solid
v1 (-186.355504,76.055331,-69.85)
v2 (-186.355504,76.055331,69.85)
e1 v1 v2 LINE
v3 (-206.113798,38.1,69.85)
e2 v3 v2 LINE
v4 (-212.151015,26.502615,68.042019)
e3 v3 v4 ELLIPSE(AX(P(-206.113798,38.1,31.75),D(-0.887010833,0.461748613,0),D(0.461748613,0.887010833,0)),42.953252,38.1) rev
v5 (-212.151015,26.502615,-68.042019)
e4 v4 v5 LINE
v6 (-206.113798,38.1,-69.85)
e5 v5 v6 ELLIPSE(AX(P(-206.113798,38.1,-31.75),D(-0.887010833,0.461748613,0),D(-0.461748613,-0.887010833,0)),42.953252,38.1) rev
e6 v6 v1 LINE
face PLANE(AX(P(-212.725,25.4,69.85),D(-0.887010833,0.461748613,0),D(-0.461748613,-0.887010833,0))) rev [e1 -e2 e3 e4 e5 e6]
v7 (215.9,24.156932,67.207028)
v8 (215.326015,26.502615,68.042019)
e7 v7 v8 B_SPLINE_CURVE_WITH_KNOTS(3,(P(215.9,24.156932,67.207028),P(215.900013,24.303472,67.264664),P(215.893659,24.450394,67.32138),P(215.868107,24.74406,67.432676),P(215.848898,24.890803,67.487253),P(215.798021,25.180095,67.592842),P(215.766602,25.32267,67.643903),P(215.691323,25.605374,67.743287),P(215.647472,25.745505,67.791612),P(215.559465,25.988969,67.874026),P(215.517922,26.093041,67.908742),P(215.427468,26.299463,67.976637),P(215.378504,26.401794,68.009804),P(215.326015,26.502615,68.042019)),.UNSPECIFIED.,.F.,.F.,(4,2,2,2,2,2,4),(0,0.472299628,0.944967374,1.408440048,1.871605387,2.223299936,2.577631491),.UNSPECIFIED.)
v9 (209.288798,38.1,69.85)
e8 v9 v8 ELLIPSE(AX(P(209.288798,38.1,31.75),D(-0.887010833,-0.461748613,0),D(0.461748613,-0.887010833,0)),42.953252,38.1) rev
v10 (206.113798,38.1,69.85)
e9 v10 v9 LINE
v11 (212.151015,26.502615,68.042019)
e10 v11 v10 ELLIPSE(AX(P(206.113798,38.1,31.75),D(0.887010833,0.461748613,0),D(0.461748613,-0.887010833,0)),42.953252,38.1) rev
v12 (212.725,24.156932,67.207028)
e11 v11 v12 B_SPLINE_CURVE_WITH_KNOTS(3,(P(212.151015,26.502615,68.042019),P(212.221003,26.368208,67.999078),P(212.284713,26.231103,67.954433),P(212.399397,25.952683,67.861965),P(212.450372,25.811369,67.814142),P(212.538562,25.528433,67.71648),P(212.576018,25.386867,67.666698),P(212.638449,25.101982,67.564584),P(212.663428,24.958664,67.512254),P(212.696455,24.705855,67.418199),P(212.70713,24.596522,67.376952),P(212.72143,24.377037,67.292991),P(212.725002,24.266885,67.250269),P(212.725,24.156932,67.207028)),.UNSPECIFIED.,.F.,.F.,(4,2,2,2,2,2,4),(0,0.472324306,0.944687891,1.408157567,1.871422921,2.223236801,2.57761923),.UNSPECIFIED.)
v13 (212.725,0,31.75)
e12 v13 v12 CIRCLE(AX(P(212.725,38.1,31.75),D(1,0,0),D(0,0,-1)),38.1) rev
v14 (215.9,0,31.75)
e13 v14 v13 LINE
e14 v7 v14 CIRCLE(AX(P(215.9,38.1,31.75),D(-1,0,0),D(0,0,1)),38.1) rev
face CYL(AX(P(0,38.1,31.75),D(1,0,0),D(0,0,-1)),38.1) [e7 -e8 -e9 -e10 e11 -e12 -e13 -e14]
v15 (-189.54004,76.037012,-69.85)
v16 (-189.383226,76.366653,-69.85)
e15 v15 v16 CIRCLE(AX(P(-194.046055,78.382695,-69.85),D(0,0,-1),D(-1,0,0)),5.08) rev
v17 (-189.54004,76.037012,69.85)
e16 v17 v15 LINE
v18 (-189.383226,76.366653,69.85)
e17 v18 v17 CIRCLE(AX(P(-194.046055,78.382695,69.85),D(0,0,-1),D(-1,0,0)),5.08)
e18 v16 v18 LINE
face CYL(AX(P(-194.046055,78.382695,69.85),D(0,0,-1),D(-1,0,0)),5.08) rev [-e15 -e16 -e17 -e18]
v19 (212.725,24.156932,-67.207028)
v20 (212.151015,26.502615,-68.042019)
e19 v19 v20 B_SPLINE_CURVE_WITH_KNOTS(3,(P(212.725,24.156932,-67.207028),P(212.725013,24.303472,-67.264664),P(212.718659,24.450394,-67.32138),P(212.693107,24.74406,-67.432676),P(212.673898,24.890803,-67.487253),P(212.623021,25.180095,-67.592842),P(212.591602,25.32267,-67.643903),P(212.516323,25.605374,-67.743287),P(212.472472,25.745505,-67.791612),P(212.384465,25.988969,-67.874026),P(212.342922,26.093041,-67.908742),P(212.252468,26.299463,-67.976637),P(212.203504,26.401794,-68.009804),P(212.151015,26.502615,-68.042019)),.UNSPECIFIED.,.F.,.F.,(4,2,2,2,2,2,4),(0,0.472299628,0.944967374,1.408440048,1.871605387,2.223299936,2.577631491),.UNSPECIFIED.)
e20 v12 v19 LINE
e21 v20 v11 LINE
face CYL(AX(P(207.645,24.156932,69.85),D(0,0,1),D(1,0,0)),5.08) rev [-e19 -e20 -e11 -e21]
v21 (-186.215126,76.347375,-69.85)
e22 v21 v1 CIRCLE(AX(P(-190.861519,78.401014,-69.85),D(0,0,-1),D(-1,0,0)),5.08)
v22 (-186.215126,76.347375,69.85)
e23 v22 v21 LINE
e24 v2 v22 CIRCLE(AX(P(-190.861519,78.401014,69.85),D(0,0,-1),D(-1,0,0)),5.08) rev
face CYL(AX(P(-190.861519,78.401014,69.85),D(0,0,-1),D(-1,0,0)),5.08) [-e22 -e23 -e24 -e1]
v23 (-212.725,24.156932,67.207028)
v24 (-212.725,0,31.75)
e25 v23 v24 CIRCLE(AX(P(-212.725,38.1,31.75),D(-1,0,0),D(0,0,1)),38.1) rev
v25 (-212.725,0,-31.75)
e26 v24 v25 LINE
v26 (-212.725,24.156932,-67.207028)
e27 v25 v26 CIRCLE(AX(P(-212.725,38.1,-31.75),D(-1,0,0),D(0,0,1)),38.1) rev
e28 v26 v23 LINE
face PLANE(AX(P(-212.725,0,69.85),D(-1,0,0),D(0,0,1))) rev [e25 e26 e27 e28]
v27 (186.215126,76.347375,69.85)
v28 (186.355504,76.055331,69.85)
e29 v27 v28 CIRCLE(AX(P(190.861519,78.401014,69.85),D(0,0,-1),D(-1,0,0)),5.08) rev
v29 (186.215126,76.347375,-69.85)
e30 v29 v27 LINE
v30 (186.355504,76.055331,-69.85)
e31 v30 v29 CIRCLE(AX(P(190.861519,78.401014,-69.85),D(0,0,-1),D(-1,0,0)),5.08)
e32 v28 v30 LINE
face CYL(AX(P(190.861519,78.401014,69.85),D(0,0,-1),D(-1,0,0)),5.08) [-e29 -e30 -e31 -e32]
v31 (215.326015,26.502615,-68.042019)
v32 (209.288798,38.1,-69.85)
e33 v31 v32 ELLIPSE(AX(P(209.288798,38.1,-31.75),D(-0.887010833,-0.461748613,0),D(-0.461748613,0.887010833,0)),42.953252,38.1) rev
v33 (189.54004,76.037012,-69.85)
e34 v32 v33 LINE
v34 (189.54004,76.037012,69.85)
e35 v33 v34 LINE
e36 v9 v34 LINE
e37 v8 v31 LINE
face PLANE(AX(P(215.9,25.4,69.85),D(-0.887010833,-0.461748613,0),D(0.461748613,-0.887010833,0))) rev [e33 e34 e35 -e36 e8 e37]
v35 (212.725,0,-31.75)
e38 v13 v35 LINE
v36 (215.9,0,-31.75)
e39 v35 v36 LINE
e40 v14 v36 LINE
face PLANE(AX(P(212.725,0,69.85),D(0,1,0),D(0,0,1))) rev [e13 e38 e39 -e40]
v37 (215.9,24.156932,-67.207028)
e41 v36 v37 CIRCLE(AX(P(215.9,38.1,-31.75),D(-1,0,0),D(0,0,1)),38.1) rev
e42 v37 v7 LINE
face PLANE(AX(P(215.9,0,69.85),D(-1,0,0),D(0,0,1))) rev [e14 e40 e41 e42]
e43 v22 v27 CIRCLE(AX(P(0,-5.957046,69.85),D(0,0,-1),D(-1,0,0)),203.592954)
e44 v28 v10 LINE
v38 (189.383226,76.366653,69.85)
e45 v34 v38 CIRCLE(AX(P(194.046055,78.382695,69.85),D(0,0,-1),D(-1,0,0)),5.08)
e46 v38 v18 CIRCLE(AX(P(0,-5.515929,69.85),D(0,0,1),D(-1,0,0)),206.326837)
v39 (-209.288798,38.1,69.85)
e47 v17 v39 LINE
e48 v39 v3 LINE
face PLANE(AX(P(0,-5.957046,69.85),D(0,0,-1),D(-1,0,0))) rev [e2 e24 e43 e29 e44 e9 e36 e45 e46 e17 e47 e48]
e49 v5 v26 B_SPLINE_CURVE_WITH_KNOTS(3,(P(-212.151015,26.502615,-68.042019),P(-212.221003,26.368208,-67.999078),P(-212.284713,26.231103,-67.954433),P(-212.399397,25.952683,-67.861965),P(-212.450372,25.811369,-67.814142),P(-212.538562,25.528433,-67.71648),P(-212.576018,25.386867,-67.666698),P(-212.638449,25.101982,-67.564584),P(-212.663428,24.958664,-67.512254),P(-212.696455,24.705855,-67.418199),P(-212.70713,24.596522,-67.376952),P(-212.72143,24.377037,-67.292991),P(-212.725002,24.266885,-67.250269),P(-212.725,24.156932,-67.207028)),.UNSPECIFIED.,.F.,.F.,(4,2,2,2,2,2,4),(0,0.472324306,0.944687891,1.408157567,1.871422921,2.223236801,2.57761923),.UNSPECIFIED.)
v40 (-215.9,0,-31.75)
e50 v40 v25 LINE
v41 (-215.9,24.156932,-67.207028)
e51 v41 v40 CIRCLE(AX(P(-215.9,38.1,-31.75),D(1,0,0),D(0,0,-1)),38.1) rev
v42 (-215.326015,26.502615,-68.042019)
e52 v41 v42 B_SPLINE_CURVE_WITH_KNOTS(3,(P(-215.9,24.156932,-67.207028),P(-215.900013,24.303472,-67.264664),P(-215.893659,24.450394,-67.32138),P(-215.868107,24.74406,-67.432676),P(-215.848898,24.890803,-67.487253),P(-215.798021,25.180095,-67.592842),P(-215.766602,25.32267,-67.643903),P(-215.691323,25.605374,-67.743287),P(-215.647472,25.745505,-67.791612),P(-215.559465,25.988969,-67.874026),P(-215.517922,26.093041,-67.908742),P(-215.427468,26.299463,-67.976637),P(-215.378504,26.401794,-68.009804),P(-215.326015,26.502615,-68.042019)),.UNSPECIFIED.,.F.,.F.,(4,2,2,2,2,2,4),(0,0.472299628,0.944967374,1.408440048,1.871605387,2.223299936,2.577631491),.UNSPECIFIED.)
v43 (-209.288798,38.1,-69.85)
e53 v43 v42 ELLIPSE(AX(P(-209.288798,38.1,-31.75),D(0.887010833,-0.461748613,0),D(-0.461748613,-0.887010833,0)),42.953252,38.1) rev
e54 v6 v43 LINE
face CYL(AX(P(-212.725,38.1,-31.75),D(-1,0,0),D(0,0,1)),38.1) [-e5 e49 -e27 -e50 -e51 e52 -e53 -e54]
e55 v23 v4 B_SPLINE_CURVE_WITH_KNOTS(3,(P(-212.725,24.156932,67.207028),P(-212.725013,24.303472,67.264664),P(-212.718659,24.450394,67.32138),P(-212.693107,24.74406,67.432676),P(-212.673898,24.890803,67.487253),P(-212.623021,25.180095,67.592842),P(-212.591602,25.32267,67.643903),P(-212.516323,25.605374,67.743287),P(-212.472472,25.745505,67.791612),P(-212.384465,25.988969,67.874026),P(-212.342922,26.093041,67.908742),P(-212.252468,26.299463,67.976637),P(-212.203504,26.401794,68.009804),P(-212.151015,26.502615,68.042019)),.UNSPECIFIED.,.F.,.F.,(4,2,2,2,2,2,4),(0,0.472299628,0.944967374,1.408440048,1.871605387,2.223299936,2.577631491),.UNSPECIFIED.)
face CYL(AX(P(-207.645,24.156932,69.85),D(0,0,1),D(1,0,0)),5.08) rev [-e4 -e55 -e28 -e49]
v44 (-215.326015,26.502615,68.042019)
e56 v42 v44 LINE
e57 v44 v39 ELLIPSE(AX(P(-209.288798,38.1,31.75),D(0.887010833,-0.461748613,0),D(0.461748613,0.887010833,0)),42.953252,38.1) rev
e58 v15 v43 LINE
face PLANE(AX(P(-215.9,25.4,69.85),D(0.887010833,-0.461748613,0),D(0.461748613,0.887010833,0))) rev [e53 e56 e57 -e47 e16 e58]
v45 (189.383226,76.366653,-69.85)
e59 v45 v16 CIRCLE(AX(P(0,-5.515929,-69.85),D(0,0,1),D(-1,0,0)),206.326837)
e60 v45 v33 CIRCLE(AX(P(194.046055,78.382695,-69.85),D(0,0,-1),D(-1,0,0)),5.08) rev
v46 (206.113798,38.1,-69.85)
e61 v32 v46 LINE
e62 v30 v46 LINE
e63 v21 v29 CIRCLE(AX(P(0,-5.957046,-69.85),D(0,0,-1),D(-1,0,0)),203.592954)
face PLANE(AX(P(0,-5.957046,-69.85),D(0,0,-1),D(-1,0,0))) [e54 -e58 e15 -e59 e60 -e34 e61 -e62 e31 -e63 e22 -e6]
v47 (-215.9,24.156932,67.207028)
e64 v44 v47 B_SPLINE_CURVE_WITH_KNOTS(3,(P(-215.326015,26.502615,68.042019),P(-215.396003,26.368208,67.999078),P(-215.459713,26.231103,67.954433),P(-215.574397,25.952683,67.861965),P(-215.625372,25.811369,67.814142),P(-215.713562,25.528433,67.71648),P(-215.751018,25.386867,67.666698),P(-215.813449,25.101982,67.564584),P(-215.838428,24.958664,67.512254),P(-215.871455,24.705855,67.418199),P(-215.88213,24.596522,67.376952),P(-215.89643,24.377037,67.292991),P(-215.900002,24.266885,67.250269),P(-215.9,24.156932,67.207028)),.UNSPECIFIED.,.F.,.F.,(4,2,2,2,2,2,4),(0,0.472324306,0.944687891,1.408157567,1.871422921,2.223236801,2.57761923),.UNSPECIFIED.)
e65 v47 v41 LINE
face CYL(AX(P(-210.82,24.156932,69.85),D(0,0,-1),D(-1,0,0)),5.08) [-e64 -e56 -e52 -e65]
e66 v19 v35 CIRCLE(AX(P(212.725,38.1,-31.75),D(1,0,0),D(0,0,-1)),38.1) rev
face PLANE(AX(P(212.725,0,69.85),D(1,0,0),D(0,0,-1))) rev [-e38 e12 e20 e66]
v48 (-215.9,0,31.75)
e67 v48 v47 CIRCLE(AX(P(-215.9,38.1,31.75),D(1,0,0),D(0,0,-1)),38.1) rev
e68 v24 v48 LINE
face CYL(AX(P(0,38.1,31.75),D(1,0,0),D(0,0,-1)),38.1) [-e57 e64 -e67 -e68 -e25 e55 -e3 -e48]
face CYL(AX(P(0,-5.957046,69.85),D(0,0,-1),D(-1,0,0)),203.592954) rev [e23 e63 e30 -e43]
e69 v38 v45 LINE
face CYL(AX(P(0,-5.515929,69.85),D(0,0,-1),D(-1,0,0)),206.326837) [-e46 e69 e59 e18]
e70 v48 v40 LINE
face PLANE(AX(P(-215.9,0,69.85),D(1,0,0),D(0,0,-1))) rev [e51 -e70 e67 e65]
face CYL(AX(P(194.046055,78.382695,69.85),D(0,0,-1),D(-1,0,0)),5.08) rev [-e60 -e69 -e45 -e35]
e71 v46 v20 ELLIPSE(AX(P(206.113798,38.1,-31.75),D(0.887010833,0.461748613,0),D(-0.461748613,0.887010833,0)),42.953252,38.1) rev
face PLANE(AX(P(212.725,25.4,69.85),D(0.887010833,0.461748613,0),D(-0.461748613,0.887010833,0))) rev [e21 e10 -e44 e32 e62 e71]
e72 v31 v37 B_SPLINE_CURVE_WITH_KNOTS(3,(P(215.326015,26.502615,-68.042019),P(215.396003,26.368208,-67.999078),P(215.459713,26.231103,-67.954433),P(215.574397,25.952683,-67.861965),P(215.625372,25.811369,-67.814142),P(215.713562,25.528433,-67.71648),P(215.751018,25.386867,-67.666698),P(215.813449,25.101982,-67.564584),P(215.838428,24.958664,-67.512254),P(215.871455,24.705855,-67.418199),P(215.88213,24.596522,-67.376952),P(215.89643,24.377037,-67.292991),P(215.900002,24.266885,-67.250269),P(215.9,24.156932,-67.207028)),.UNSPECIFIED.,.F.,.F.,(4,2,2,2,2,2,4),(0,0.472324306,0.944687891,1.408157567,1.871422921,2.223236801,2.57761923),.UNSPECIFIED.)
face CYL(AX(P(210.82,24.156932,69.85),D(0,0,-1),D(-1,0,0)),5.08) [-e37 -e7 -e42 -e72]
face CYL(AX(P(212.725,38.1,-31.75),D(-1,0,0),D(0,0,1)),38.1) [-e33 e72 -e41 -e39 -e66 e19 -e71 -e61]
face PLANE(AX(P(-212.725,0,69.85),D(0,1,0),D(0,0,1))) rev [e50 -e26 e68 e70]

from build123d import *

# Parameters (mm, degrees)
BOSS_EXTRUDE1_DEPTH = 69.85
FILLET1_R           = 38.1
FILLET2_R           = 38.1
FILLET3_R           = 38.1
FILLET4_R           = 38.1
FILLET5_R           = 5.08
FILLET6_R           = 5.08


with BuildPart() as part:
    # Sketch2 → Boss-Extrude1 (new, symmetric)
    with BuildSketch(Plane.XY):
        with BuildLine():
            Line((-212.725, 0), (-215.9, 0))
            Line((-215.9, 0), (-215.9, 25.4))
            Line((-215.9, 25.4), (-189.455193832, 76.2))
            ThreePointArc((-189.455193832, 76.2), (0, 200.810907661), (189.455193832, 76.2))
            Line((189.455193832, 76.2), (215.9, 25.4))
            Line((215.9, 25.4), (215.9, 0))
            Line((215.9, 0), (212.725, 0))
            Line((212.725, 0), (212.725, 25.4))
            Line((212.725, 25.4), (186.280193832, 76.2))
            ThreePointArc((186.280193832, 76.2), (0, 197.635907661), (-186.280193832, 76.2))
            Line((-186.280193832, 76.2), (-212.725, 25.4))
            Line((-212.725, 25.4), (-212.725, 0))
        make_face()
    extrude(amount=BOSS_EXTRUDE1_DEPTH, both=True)

    # Fillet1
    # the kernel refuses this fillet: 38.1 mm, written as the material it takes off along each edge
    with BuildSketch(Plane(origin=(311.15, 0, -69.85), x_dir=(0, 1, 0), z_dir=(-1, 0, 0))) as fillet1_piece_1:
        with BuildLine():
            CenterArc((FILLET1_R, -FILLET1_R), FILLET1_R, 90, 90)
            Line((0, -FILLET1_R), (0, 0))
            Line((0, 0), (FILLET1_R, 0))
        make_face()
    extrude(amount=193.675, mode=Mode.SUBTRACT)

    # Fillet2
    # the kernel refuses this fillet: 38.1 mm, written as the material it takes off along each edge
    with BuildSketch(Plane(origin=(311.15, 0, 69.85), x_dir=(0, 0, -1), z_dir=(-1, 0, 0))) as fillet2_piece_1:
        with BuildLine():
            CenterArc((FILLET2_R, -FILLET2_R), FILLET2_R, 90, 90)
            Line((0, -FILLET2_R), (0, 0))
            Line((0, 0), (FILLET2_R, 0))
        make_face()
    extrude(amount=193.675, mode=Mode.SUBTRACT)

    # Fillet3
    # the kernel refuses this fillet: 38.1 mm, written as the material it takes off along each edge
    with BuildSketch(Plane(origin=(-117.475, 0, 69.85), x_dir=(0, 1, 0), z_dir=(-1, 0, 0))) as fillet3_piece_1:
        with BuildLine():
            CenterArc((FILLET3_R, FILLET3_R), FILLET3_R, 180, 90)
            Line((0, FILLET3_R), (0, 0))
            Line((0, 0), (FILLET3_R, 0))
        make_face()
    extrude(amount=193.675, mode=Mode.SUBTRACT)

    # Fillet4
    # the kernel refuses this fillet: 38.1 mm, written as the material it takes off along each edge
    with BuildSketch(Plane(origin=(-117.475, 0, -69.85), x_dir=(0, 1, 0), z_dir=(-1, 0, 0))) as fillet4_piece_1:
        with BuildLine():
            CenterArc((FILLET4_R, -FILLET4_R), FILLET4_R, 90, 90)
            Line((0, -FILLET4_R), (0, 0))
            Line((0, 0), (FILLET4_R, 0))
        make_face()
    extrude(amount=193.675, mode=Mode.SUBTRACT)

    # Fillet5
    fillet5_edges = [part.edges().sort_by_distance(p)[0] for p in [
        (215.9, 25.4, 0),
        (-215.9, 25.4, 0),
        (-212.725, 25.4, 0),
        (212.725, 25.4, 0),
    ]]
    fillet(fillet5_edges, radius=FILLET5_R)

    # Fillet6
    # the kernel refuses this fillet: 5.08 mm, written as the material it adds along each edge
    with BuildSketch(Plane(origin=(-189.455193832, 76.2, 69.85), x_dir=(0.3964547937843397, 0.9180542448490813, 0), z_dir=(0, 0, -1))) as fillet6_piece_1:
        with BuildLine():
            CenterArc((0.183763375, -5.079999508), FILLET6_R, 90.025204734, 4.118058509)
            Line((-0.183269559, -0.013276028), (0, 0))
            ThreePointArc((0, 0), (0.090764327, -1.9964e-05), (0.181528655, 0))
        make_face()
    extrude(amount=139.7)
    with BuildSketch(Plane(origin=(189.455193832, 76.2, 69.85), x_dir=(0.4617486132350293, -0.887010833178224, 0), z_dir=(0, 0, -1))) as fillet6_piece_2:
        with BuildLine():
            CenterArc((0.183749786, -5.08), FILLET6_R, 90, 4.118058509)
            ThreePointArc((-0.181054232, -0.01311555), (-0.090525673, -0.006577687), (0, 0))
            Line((0, 0), (0.183749786, 0))
        make_face()
    extrude(amount=139.7)
    # the kernel refuses this fillet: 5.08 mm, written as the material it takes off along each edge
    with BuildSketch(Plane(origin=(186.280193832, 76.2, 70.257743197), x_dir=(0.4617486132350699, -0.8870108331782028, 0), z_dir=(0, 0, -1))) as fillet6_2_piece_1:
        with BuildLine():
            CenterArc((0.163097279, -5.08), FILLET6_R, 90, 3.655257242)
            ThreePointArc((-0.160768001, -0.010334204), (-0.080382979, -0.005183004), (0, 0))
            Line((0, 0), (0.163097279, 0))
        make_face()
    extrude(amount=140.515486395, mode=Mode.SUBTRACT)
    with BuildSketch(Plane(origin=(-186.280193832, 76.2, 70.257743197), x_dir=(-0.46174861323509436, -0.8870108331781903, 0), z_dir=(0, 0, -1))) as fillet6_2_piece_2:
        with BuildLine():
            CenterArc((0.163097279, 5.08), FILLET6_R, 266.344742758, 3.655257242)
            ThreePointArc((-0.160768001, 0.010334204), (-0.080382979, 0.005183004), (0, 0))
            Line((0, 0), (0.163097279, 0))
        make_face()
    extrude(amount=140.515486395, mode=Mode.SUBTRACT)


solid = part.part
